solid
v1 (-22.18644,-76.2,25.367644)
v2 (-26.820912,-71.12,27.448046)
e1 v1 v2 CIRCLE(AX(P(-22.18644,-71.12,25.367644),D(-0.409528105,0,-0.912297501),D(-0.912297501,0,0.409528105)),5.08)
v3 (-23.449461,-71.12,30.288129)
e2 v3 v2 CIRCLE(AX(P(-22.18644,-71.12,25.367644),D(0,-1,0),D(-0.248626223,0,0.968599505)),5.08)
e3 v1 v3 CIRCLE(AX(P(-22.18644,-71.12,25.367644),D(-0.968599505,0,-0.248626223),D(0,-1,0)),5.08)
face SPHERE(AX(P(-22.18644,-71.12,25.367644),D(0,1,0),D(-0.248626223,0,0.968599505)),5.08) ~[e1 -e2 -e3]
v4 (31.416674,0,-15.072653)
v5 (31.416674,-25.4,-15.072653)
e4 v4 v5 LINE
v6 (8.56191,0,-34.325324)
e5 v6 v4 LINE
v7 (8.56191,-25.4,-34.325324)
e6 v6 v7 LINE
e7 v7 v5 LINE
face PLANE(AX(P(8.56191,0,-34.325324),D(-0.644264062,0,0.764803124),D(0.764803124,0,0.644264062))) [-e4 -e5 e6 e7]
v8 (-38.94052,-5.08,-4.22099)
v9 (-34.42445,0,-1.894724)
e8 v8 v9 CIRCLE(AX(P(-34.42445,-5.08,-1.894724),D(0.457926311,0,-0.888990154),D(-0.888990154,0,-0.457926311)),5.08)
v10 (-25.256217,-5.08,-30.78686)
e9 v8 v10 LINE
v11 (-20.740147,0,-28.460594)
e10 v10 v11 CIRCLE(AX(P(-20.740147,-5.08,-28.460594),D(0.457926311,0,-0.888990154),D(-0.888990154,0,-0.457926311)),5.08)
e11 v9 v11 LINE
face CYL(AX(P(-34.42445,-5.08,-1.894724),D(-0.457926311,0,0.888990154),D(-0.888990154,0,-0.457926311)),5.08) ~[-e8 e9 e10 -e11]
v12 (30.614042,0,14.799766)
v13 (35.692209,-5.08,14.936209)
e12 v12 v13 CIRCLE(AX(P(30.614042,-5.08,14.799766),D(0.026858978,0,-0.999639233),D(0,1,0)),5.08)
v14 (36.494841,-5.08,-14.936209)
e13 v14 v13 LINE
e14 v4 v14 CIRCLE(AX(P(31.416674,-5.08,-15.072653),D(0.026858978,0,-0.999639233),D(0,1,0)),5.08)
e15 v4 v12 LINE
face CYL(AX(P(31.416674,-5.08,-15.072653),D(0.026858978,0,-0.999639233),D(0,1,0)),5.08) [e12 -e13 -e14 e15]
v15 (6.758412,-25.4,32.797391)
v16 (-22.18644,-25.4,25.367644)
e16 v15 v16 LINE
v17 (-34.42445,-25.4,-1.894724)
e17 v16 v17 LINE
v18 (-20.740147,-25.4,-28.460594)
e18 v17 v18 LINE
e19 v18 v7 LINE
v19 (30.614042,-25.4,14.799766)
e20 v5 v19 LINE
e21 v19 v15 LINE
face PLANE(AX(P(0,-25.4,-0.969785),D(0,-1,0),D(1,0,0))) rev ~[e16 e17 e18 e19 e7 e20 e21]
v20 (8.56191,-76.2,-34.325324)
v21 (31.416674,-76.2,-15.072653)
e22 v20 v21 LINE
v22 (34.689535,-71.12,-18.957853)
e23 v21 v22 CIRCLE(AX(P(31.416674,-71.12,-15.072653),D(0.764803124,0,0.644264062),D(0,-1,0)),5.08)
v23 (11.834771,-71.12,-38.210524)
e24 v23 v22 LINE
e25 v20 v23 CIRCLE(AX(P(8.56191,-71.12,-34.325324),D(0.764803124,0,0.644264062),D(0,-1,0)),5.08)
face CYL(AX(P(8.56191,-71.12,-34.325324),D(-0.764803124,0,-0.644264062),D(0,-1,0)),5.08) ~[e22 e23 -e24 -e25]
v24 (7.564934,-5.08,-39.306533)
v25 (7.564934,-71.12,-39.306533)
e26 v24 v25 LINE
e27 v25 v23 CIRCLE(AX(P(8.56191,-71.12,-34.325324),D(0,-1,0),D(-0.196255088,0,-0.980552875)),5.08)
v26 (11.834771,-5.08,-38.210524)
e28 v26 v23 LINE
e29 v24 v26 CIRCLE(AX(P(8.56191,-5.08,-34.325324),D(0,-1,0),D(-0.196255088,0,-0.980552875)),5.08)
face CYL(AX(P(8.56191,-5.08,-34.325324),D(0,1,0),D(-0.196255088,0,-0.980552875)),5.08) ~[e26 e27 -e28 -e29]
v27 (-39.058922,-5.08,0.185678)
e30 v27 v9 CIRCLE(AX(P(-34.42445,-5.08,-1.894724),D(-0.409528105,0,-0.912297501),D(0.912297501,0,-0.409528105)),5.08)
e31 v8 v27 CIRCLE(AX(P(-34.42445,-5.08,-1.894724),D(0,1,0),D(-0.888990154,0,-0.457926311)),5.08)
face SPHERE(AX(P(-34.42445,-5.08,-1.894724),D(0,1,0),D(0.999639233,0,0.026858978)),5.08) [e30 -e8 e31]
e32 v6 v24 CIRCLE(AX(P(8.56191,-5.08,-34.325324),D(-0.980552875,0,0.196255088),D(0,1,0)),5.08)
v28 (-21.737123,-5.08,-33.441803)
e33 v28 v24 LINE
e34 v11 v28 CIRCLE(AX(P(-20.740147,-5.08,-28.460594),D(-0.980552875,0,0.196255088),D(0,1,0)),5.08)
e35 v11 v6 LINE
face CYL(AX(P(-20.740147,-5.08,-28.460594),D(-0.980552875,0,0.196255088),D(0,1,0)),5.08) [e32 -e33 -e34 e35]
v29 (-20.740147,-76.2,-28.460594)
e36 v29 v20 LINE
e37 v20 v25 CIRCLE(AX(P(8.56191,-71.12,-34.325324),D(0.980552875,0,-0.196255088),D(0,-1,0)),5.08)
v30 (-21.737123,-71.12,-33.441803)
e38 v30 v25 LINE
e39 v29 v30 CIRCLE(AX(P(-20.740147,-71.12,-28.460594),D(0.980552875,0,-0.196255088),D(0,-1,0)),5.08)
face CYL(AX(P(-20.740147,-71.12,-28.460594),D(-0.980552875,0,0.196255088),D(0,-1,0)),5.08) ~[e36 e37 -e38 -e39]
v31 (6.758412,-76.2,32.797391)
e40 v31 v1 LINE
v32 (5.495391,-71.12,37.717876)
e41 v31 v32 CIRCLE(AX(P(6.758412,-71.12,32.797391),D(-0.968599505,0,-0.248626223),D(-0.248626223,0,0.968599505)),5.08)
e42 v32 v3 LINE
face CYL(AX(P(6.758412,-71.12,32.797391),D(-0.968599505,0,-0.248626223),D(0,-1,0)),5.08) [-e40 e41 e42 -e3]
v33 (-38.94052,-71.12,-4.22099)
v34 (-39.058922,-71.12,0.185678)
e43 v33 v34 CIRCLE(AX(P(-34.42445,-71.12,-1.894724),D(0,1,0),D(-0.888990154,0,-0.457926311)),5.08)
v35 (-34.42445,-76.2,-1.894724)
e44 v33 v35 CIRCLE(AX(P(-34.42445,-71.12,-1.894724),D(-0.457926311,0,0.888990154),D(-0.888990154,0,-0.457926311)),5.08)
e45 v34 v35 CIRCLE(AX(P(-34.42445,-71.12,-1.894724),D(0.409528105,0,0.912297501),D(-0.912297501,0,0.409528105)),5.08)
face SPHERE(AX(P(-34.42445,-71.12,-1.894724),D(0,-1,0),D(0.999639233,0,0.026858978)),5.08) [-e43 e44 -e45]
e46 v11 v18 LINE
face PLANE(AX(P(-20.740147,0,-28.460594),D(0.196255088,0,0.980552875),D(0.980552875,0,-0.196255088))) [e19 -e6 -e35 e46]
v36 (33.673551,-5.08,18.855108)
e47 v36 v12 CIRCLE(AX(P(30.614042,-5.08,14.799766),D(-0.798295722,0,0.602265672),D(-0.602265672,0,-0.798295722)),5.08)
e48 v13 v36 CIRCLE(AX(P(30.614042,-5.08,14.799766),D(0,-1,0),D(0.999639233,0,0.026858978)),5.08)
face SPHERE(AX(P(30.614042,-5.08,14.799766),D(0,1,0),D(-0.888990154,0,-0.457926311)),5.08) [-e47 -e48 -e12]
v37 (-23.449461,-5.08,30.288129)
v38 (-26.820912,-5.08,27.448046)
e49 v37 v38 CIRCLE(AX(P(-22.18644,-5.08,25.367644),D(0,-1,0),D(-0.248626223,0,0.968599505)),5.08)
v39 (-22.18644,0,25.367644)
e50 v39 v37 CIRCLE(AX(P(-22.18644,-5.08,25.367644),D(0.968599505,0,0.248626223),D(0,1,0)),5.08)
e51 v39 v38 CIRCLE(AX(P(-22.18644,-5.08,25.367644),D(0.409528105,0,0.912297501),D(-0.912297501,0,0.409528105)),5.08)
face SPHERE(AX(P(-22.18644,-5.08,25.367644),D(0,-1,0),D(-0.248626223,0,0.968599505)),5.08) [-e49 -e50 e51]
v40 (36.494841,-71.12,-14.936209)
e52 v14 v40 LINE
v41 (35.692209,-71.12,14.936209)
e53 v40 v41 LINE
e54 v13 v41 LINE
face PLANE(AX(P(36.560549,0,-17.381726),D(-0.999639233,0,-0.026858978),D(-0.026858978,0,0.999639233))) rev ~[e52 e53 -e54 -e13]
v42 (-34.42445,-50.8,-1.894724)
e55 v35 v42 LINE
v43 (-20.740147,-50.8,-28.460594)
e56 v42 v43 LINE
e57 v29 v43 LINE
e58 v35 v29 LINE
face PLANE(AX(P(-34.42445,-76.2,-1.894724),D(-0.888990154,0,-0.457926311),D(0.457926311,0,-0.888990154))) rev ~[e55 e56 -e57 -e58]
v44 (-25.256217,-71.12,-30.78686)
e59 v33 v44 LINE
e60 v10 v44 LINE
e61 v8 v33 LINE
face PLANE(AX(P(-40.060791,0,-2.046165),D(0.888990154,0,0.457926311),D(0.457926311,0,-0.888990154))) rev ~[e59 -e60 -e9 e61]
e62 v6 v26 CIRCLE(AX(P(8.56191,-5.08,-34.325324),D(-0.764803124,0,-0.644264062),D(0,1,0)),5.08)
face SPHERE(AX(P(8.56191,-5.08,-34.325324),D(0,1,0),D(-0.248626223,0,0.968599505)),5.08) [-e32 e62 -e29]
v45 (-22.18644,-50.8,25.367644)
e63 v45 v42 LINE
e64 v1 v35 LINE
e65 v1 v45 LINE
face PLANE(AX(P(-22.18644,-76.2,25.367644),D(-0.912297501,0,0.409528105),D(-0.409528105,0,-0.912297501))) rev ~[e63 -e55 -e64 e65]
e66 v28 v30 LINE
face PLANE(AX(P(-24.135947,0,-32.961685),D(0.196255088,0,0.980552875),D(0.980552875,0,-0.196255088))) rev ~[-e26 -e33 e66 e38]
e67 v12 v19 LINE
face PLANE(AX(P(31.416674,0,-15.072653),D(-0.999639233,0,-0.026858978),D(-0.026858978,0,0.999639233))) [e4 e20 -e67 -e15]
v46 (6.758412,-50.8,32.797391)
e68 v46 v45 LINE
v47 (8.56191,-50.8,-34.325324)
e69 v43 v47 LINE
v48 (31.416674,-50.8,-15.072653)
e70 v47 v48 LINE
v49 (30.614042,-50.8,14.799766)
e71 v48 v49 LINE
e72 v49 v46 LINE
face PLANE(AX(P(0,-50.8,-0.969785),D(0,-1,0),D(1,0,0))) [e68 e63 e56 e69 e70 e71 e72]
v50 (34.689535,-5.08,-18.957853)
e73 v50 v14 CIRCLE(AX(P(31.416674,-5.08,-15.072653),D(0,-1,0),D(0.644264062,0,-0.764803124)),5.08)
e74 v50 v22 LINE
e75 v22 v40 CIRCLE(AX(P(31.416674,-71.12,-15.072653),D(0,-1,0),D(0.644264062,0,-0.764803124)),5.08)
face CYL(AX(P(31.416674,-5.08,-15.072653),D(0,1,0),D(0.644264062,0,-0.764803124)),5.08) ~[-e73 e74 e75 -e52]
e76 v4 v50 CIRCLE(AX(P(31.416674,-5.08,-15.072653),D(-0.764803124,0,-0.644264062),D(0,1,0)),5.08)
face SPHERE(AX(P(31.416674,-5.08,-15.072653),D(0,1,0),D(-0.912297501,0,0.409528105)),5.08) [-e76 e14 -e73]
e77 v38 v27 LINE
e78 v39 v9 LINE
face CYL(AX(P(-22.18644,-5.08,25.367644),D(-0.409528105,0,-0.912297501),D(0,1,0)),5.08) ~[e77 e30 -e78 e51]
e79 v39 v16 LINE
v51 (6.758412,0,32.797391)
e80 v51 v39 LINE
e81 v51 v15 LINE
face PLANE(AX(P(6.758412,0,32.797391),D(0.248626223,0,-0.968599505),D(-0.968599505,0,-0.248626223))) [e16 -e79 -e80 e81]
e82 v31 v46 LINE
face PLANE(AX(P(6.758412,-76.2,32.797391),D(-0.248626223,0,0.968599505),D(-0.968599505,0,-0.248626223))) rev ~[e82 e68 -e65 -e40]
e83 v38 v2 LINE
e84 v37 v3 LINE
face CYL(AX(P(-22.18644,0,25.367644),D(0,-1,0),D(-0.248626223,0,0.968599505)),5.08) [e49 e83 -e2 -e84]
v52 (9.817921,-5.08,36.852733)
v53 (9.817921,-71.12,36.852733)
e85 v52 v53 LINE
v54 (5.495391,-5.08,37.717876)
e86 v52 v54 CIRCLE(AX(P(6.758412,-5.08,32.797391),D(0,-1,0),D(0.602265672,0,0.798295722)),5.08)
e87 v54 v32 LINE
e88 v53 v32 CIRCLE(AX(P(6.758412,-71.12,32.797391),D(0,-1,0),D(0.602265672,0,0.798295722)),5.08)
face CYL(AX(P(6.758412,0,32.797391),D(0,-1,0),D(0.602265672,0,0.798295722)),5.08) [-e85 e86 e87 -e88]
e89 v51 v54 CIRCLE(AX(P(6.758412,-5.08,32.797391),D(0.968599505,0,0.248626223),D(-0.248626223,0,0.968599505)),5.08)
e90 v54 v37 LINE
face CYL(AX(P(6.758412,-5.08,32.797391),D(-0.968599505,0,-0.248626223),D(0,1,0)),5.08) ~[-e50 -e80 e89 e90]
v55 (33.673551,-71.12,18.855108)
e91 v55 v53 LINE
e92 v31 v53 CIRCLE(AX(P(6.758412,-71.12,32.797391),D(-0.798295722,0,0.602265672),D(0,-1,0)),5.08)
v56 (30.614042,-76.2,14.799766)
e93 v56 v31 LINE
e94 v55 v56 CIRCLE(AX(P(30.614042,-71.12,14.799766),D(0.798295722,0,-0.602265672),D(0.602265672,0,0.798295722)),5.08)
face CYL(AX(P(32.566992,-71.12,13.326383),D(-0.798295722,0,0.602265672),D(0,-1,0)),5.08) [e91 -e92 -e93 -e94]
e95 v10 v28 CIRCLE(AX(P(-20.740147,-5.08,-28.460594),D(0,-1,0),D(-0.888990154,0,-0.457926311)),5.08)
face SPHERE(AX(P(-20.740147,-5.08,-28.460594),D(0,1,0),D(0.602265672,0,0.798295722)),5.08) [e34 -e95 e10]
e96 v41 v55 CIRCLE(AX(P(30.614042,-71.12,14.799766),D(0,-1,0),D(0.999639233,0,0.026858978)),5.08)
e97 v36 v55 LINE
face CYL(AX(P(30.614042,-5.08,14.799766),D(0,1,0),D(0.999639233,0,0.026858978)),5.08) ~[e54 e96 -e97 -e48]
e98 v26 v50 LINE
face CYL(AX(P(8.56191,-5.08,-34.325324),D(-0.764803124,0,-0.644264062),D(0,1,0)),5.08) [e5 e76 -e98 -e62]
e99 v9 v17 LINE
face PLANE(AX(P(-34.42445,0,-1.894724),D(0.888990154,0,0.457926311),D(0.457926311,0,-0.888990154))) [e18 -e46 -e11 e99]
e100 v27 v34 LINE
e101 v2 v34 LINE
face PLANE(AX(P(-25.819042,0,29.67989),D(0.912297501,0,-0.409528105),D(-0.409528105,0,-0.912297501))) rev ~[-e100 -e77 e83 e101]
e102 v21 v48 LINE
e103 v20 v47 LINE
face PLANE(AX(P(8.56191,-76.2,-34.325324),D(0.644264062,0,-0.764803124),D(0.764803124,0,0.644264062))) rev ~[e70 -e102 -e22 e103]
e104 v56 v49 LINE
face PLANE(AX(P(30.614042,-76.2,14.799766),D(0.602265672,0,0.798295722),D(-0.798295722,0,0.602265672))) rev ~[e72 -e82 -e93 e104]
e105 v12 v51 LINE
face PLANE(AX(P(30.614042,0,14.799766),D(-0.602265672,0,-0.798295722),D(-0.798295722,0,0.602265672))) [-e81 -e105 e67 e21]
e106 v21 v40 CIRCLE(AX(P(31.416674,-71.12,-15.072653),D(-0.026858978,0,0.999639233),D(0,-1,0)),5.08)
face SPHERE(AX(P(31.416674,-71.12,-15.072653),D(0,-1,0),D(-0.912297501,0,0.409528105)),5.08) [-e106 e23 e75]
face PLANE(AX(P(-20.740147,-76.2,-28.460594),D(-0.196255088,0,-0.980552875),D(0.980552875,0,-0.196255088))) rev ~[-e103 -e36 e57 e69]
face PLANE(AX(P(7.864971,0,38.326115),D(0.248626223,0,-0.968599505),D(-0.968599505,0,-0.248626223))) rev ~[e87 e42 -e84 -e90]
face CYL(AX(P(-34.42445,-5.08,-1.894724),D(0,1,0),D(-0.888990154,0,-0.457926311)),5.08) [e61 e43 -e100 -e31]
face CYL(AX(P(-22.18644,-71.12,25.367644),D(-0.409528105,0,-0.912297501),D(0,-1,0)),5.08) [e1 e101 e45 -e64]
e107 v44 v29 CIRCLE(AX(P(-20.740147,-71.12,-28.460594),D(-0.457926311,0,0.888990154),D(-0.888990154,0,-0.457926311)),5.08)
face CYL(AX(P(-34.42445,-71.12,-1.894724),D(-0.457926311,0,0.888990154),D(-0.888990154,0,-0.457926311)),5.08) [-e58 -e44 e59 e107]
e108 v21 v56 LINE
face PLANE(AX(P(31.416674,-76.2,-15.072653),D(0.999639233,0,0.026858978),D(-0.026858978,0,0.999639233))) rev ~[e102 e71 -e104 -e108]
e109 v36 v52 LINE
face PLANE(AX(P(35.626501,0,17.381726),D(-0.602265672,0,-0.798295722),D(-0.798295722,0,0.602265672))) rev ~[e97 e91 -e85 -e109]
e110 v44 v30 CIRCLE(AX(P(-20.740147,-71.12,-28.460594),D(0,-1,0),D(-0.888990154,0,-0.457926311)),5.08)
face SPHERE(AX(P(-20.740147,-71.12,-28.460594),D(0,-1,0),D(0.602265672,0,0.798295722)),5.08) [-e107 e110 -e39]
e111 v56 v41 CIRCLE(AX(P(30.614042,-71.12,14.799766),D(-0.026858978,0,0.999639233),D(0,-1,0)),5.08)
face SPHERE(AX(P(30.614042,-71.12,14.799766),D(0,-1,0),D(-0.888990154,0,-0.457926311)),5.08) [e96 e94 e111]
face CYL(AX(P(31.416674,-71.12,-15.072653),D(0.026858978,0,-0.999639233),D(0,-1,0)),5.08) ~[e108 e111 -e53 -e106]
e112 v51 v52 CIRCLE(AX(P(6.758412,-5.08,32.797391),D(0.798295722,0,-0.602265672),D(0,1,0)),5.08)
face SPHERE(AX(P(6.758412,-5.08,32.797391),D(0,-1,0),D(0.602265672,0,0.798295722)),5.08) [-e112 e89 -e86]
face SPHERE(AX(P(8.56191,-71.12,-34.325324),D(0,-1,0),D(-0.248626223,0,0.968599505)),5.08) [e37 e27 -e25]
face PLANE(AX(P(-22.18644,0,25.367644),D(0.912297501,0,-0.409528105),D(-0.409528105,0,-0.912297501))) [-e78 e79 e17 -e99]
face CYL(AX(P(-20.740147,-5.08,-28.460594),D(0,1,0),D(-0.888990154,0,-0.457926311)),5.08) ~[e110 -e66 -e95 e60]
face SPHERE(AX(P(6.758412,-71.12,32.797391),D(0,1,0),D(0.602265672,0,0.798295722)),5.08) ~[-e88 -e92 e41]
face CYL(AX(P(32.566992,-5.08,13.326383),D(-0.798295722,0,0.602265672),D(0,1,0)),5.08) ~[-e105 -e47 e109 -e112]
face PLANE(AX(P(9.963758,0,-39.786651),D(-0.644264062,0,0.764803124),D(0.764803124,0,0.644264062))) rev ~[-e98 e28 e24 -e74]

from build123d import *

# Parameters (mm, degrees)
F1_DEPTH     = 76.2
F2_F1_R      = 5.08
F2_F2_R      = 5.08
F2_F3_R      = 5.08
F2_F4_R      = 5.08
F3_T1_DEPTH  = 66.04
F3_T3_DEPTH  = 29.883199232
F3_T5_DEPTH  = 29.883199232
F3_T7_DEPTH  = 29.883199232
F3_T9_DEPTH  = 29.883199232
F3_T14_DEPTH = 5.08
F3_T20_DEPTH = 5.08
F3_T26_DEPTH = 5.08
F3_T32_DEPTH = 5.08
F3_T38_DEPTH = 5.08
F3_T44_DEPTH = 5.08
F3_T50_DEPTH = 5.08
F3_T56_DEPTH = 5.08
F3_T62_DEPTH = 5.08
F3_T68_DEPTH = 5.08
F5_DEPTH     = 25.4
F6_DEPTH     = 25.4


# Not quite as in the source:
# - a fillet or chamfer that OpenCascade refuses, or shapes differently, is made with other operations: its cross-section is extruded or revolved along the edge and cut away or added
# - a feature of the source that left no trace in its solid (it failed there, or was rolled back) is left out


with BuildPart() as f1:
    # F0 (on Front) → F1 (new body)
    with BuildSketch(Plane.XZ):
        Polygon((36.5605491077, -17.381725656), (35.6265013603, 17.381725656), (7.8649714404, 38.3261150914), (-25.8190423903, 29.6798902177), (-40.0607906887, -2.0461652844), (-24.1359465072, -32.9616845282), (9.9637576777, -39.7866509615), align=None)
    extrude(amount=F1_DEPTH)

    # F2: fillet of radius 5.08 on 4 edges, made by hand

    # F2_f1
    f2_f1_edges = [f1.edges().sort_by_distance(p)[0] for p in [
        (7.8649714404, -38.1, 38.3261150914),
    ]]
    fillet(f2_f1_edges, radius=F2_F1_R)

    # F2_f2
    f2_f2_edges = [f1.edges().sort_by_distance(p)[0] for p in [
        (-25.8190423903, -38.1, 29.6798902177),
    ]]
    fillet(f2_f2_edges, radius=F2_F2_R)

    # F2_f3
    f2_f3_edges = [f1.edges().sort_by_distance(p)[0] for p in [
        (-8.9770354749, 0, 34.0030026545),
    ]]
    fillet(f2_f3_edges, radius=F2_F3_R)

    # F2_f4
    f2_f4_edges = [f1.edges().sort_by_distance(p)[0] for p in [
        (-8.9770354749, -76.2, 34.0030026545),
    ]]
    fillet(f2_f4_edges, radius=F2_F4_R)

    # F3: fillet of radius 5.08 on 19 edges, made by hand

    # F3_s2 → F3_t1 (cut)
    with BuildSketch(Plane.XZ.offset(5.08)):
        with BuildLine():
            ThreePointArc((35.6922091389, 14.9362091735), (35.1301118192, 17.1260312252), (33.6735514536, 18.8551078331))
            Line((33.6735514536, 18.8551078331), (35.6265013603, 17.381725656))
            Line((35.6265013603, 17.381725656), (35.6922091389, 14.9362091735))
        make_face()
        with BuildLine():
            ThreePointArc((34.6895354607, -18.957852653), (36.0511453352, -17.1530555552), (36.4948413291, -14.9362091735))
            Line((36.4948413291, -14.9362091735), (36.5605491077, -17.381725656))
            Line((36.5605491077, -17.381725656), (34.6895354607, -18.957852653))
        make_face()
        with BuildLine():
            ThreePointArc((7.564934043, -39.3065326972), (9.8249311044, -39.245809579), (11.8347713247, -38.2105239645))
            Line((11.8347713247, -38.2105239645), (9.9637576777, -39.7866509615))
            Line((9.9637576777, -39.7866509615), (7.564934043, -39.3065326972))
        make_face()
        with BuildLine():
            ThreePointArc((-25.2562170056, -30.7868598483), (-23.79965664, -32.5159364562), (-21.7371228725, -33.4418027925))
            Line((-21.7371228725, -33.4418027925), (-24.1359465072, -32.9616845282))
            Line((-24.1359465072, -32.9616845282), (-25.2562170056, -30.7868598483))
        make_face()
        with BuildLine():
            ThreePointArc((-38.9405201903, -4.2209899644), (-39.50261751, -2.0311679128), (-39.0589215161, 0.1856784689))
            Line((-39.0589215161, 0.1856784689), (-40.0607906887, -2.0461652844))
            Line((-40.0607906887, -2.0461652844), (-38.9405201903, -4.2209899644))
        make_face()
    extrude(amount=F3_T1_DEPTH, mode=Mode.SUBTRACT)

    # F3_s4 → F3_t3 (cut)
    with BuildSketch(Plane(origin=(0.4273541338, 0, -15.9052946325), x_dir=(0, 1, 0), z_dir=(-0.026858978, 0, 0.9996392326))):
        with BuildLine():
            ThreePointArc((-76.2, -31.0005038658), (-74.7121024484, -34.5926063143), (-71.12, -36.0805038658))
            Line((-71.12, -36.0805038658), (-76.2, -36.0805038658))
            Line((-76.2, -36.0805038658), (-76.2, -31.0005038658))
        make_face()
        with BuildLine():
            ThreePointArc((0, -31.0005038658), (-1.4878975516, -34.5926063143), (-5.08, -36.0805038658))
            Line((-5.08, -36.0805038658), (0, -36.0805038658))
            Line((0, -36.0805038658), (0, -31.0005038658))
        make_face()
    extrude(amount=F3_T3_DEPTH, mode=Mode.SUBTRACT)

    # F3_s6 → F3_t5 (cut)
    with BuildSketch(Plane(origin=(-11.9052292748, 0, -10.0288703376), x_dir=(0, 1, 0), z_dir=(0.7648031243, 0, 0.6442640616))):
        with BuildLine():
            ThreePointArc((0, -31.7682459503), (-1.4878975516, -35.3603483987), (-5.08, -36.8482459503))
            Line((-5.08, -36.8482459503), (0, -36.8482459503))
            Line((0, -36.8482459503), (0, -31.7682459503))
        make_face()
        with BuildLine():
            ThreePointArc((-76.2, -31.7682459503), (-74.7121024484, -35.3603483987), (-71.12, -36.8482459503))
            Line((-71.12, -36.8482459503), (-76.2, -36.8482459503))
            Line((-76.2, -36.8482459503), (-76.2, -31.7682459503))
        make_face()
    extrude(amount=F3_T5_DEPTH, mode=Mode.SUBTRACT)

    # F3_s8 → F3_t7 (cut)
    with BuildSketch(Plane(origin=(-14.4644044829, 0, 2.8950126528), x_dir=(0, 1, 0), z_dir=(0.9805528748, 0, -0.1962550883))):
        with BuildLine():
            ThreePointArc((0, -31.9774768364), (-1.4878975516, -35.5695792849), (-5.08, -37.0574768364))
            Line((-5.08, -37.0574768364), (0, -37.0574768364))
            Line((0, -37.0574768364), (0, -31.9774768364))
        make_face()
        with BuildLine():
            ThreePointArc((-76.2, -31.9774768364), (-74.7121024484, -35.5695792849), (-71.12, -37.0574768364))
            Line((-71.12, -37.0574768364), (-76.2, -37.0574768364))
            Line((-76.2, -37.0574768364), (-76.2, -31.9774768364))
        make_face()
    extrude(amount=F3_T7_DEPTH, mode=Mode.SUBTRACT)

    # F3_s10 → F3_t9 (cut)
    with BuildSketch(Plane(origin=(-6.4473598679, 0, 12.5165104158), x_dir=(0, 1, 0), z_dir=(0.457926311, 0, -0.8889901539))):
        with BuildLine():
            ThreePointArc((-71.12, -36.5506413995), (-74.7121024484, -35.0627438479), (-76.2, -31.4706413995))
            Line((-76.2, -31.4706413995), (-76.2, -36.5506413995))
            Line((-76.2, -36.5506413995), (-71.12, -36.5506413995))
        make_face()
        with BuildLine():
            ThreePointArc((-5.08, -36.5506413995), (-1.4878975516, -35.0627438479), (0, -31.4706413995))
            Line((0, -31.4706413995), (0, -36.5506413995))
            Line((0, -36.5506413995), (-5.08, -36.5506413995))
        make_face()
    extrude(amount=F3_T9_DEPTH, mode=Mode.SUBTRACT)


with BuildPart() as f3_tool12:
    # F3_s13 → F3_t14 (new body)
    with BuildSketch(Plane.XZ.offset(71.12)):
        Polygon((30.6140418374, 14.7997655654), (35.6922091389, 14.9362091735), (35.6265013603, 17.381725656), (33.6735514536, 18.8551078331), align=None)
    extrude(amount=F3_T14_DEPTH)

    # F3_s15 → F3_t16 (revolve, cut)
    with BuildSketch(Plane(origin=(30.6140418374, -71.12, 14.7997655654), x_dir=(-0.8889901539, 0, -0.457926311), z_dir=(-0.457926311, 0, 0.8889901539))):
        with BuildLine():
            ThreePointArc((0, -5.08), (5.08, 0), (0, 5.08))
            Line((0, 5.08), (0, -5.08))
        make_face()
    revolve(axis=Axis((30.6140418374, -71.12, 14.7997655654), (0, -1, 0)), mode=Mode.SUBTRACT)


with BuildPart() as f1_1:
    add(f1.part)

    # F3_t11: cut F3_tool12
    add(f3_tool12.part, mode=Mode.SUBTRACT)


with BuildPart() as f3_tool18:
    # F3_s19 → F3_t20 (new body)
    with BuildSketch(Plane.XZ.offset(5.08)):
        Polygon((30.6140418374, 14.7997655654), (35.6922091389, 14.9362091735), (35.6265013603, 17.381725656), (33.6735514536, 18.8551078331), align=None)
    extrude(amount=-F3_T20_DEPTH)

    # F3_s21 → F3_t22 (revolve, cut)
    with BuildSketch(Plane(origin=(30.6140418374, -5.08, 14.7997655654), x_dir=(-0.8889901539, 0, -0.457926311), z_dir=(0.457926311, 0, -0.8889901539))):
        with BuildLine():
            ThreePointArc((0, -5.08), (5.08, 0), (0, 5.08))
            Line((0, 5.08), (0, -5.08))
        make_face()
    revolve(axis=Axis((30.6140418374, -5.08, 14.7997655654), (0, 1, 0)), mode=Mode.SUBTRACT)


with BuildPart() as f1_2:
    add(f1_1.part)

    # F3_t17: cut F3_tool18
    add(f3_tool18.part, mode=Mode.SUBTRACT)


with BuildPart() as f3_tool24:
    # F3_s25 → F3_t26 (new body)
    with BuildSketch(Plane.XZ.offset(5.08)):
        Polygon((-34.4244502085, -1.8947243046), (-38.9405201903, -4.2209899644), (-40.0607906887, -2.0461652844), (-39.0589215161, 0.1856784689), align=None)
    extrude(amount=-F3_T26_DEPTH)

    # F3_s27 → F3_t28 (revolve, cut)
    with BuildSketch(Plane(origin=(-34.4244502085, -5.08, -1.8947243046), x_dir=(0.9996392326, 0, 0.026858978), z_dir=(-0.026858978, 0, 0.9996392326))):
        with BuildLine():
            ThreePointArc((0, -5.08), (5.08, 0), (0, 5.08))
            Line((0, 5.08), (0, -5.08))
        make_face()
    revolve(axis=Axis((-34.4244502085, -5.08, -1.8947243046), (0, 1, 0)), mode=Mode.SUBTRACT)


with BuildPart() as f1_3:
    add(f1_2.part)

    # F3_t23: cut F3_tool24
    add(f3_tool24.part, mode=Mode.SUBTRACT)


with BuildPart() as f3_tool30:
    # F3_s31 → F3_t32 (new body)
    with BuildSketch(Plane.XZ.offset(71.12)):
        Polygon((-34.4244502085, -1.8947243046), (-38.9405201903, -4.2209899644), (-40.0607906887, -2.0461652844), (-39.0589215161, 0.1856784689), align=None)
    extrude(amount=F3_T32_DEPTH)

    # F3_s33 → F3_t34 (revolve, cut)
    with BuildSketch(Plane(origin=(-34.4244502085, -71.12, -1.8947243046), x_dir=(0.9996392326, 0, 0.026858978), z_dir=(0.026858978, 0, -0.9996392326))):
        with BuildLine():
            ThreePointArc((0, -5.08), (5.08, 0), (0, 5.08))
            Line((0, 5.08), (0, -5.08))
        make_face()
    revolve(axis=Axis((-34.4244502085, -71.12, -1.8947243046), (0, -1, 0)), mode=Mode.SUBTRACT)


with BuildPart() as f1_4:
    add(f1_3.part)

    # F3_t29: cut F3_tool30
    add(f3_tool30.part, mode=Mode.SUBTRACT)


with BuildPart() as f3_tool36:
    # F3_s37 → F3_t38 (new body)
    with BuildSketch(Plane.XZ.offset(71.12)):
        Polygon((31.4166740277, -15.0726527817), (36.4948413291, -14.9362091735), (36.5605491077, -17.381725656), (34.6895354607, -18.957852653), align=None)
    extrude(amount=F3_T38_DEPTH)

    # F3_s39 → F3_t40 (revolve, cut)
    with BuildSketch(Plane(origin=(31.4166740277, -71.12, -15.0726527817), x_dir=(-0.9122975015, 0, 0.409528105), z_dir=(0.409528105, 0, 0.9122975015))):
        with BuildLine():
            ThreePointArc((0, -5.08), (5.08, 0), (0, 5.08))
            Line((0, 5.08), (0, -5.08))
        make_face()
    revolve(axis=Axis((31.4166740277, -71.12, -15.0726527817), (0, -1, 0)), mode=Mode.SUBTRACT)


with BuildPart() as f1_5:
    add(f1_4.part)

    # F3_t35: cut F3_tool36
    add(f3_tool36.part, mode=Mode.SUBTRACT)


with BuildPart() as f3_tool42:
    # F3_s43 → F3_t44 (new body)
    with BuildSketch(Plane.XZ.offset(5.08)):
        Polygon((31.4166740277, -15.0726527817), (36.4948413291, -14.9362091735), (36.5605491077, -17.381725656), (34.6895354607, -18.957852653), align=None)
    extrude(amount=-F3_T44_DEPTH)

    # F3_s45 → F3_t46 (revolve, cut)
    with BuildSketch(Plane(origin=(31.4166740277, -5.08, -15.0726527817), x_dir=(-0.9122975015, 0, 0.409528105), z_dir=(-0.409528105, 0, -0.9122975015))):
        with BuildLine():
            ThreePointArc((0, -5.08), (5.08, 0), (0, 5.08))
            Line((0, 5.08), (0, -5.08))
        make_face()
    revolve(axis=Axis((31.4166740277, -5.08, -15.0726527817), (0, 1, 0)), mode=Mode.SUBTRACT)


with BuildPart() as f1_6:
    add(f1_5.part)

    # F3_t41: cut F3_tool42
    add(f3_tool42.part, mode=Mode.SUBTRACT)


with BuildPart() as f3_tool48:
    # F3_s49 → F3_t50 (new body)
    with BuildSketch(Plane.XZ.offset(5.08)):
        Polygon((8.5619098917, -34.3253240931), (7.564934043, -39.3065326972), (9.9637576777, -39.7866509615), (11.8347713247, -38.2105239645), align=None)
    extrude(amount=-F3_T50_DEPTH)

    # F3_s51 → F3_t52 (revolve, cut)
    with BuildSketch(Plane(origin=(8.5619098917, -5.08, -34.3253240931), x_dir=(-0.248626223, 0, 0.9685995051), z_dir=(-0.9685995051, 0, -0.248626223))):
        with BuildLine():
            ThreePointArc((0, -5.08), (5.08, 0), (0, 5.08))
            Line((0, 5.08), (0, -5.08))
        make_face()
    revolve(axis=Axis((8.5619098917, -5.08, -34.3253240931), (0, 1, 0)), mode=Mode.SUBTRACT)


with BuildPart() as f1_7:
    add(f1_6.part)

    # F3_t47: cut F3_tool48
    add(f3_tool48.part, mode=Mode.SUBTRACT)


with BuildPart() as f3_tool54:
    # F3_s55 → F3_t56 (new body)
    with BuildSketch(Plane.XZ.offset(71.12)):
        Polygon((8.5619098917, -34.3253240931), (7.564934043, -39.3065326972), (9.9637576777, -39.7866509615), (11.8347713247, -38.2105239645), align=None)
    extrude(amount=F3_T56_DEPTH)

    # F3_s57 → F3_t58 (revolve, cut)
    with BuildSketch(Plane(origin=(8.5619098917, -71.12, -34.3253240931), x_dir=(-0.248626223, 0, 0.9685995051), z_dir=(0.9685995051, 0, 0.248626223))):
        with BuildLine():
            ThreePointArc((0, -5.08), (5.08, 0), (0, 5.08))
            Line((0, 5.08), (0, -5.08))
        make_face()
    revolve(axis=Axis((8.5619098917, -71.12, -34.3253240931), (0, -1, 0)), mode=Mode.SUBTRACT)


with BuildPart() as f1_8:
    add(f1_7.part)

    # F3_t53: cut F3_tool54
    add(f3_tool54.part, mode=Mode.SUBTRACT)


with BuildPart() as f3_tool60:
    # F3_s61 → F3_t62 (new body)
    with BuildSketch(Plane.XZ.offset(5.08)):
        Polygon((-20.7401470239, -28.4605941885), (-21.7371228725, -33.4418027925), (-24.1359465072, -32.9616845282), (-25.2562170056, -30.7868598483), align=None)
    extrude(amount=-F3_T62_DEPTH)

    # F3_s63 → F3_t64 (revolve, cut)
    with BuildSketch(Plane(origin=(-20.7401470239, -5.08, -28.4605941885), x_dir=(0.6022656725, 0, 0.798295722), z_dir=(-0.798295722, 0, 0.6022656725))):
        with BuildLine():
            ThreePointArc((0, -5.08), (5.08, 0), (0, 5.08))
            Line((0, 5.08), (0, -5.08))
        make_face()
    revolve(axis=Axis((-20.7401470239, -5.08, -28.4605941885), (0, 1, 0)), mode=Mode.SUBTRACT)


with BuildPart() as f1_9:
    add(f1_8.part)

    # F3_t59: cut F3_tool60
    add(f3_tool60.part, mode=Mode.SUBTRACT)


with BuildPart() as f3_tool66:
    # F3_s67 → F3_t68 (new body)
    with BuildSketch(Plane.XZ.offset(71.12)):
        Polygon((-20.7401470239, -28.4605941885), (-21.7371228725, -33.4418027925), (-24.1359465072, -32.9616845282), (-25.2562170056, -30.7868598483), align=None)
    extrude(amount=F3_T68_DEPTH)

    # F3_s69 → F3_t70 (revolve, cut)
    with BuildSketch(Plane(origin=(-20.7401470239, -71.12, -28.4605941885), x_dir=(0.6022656725, 0, 0.798295722), z_dir=(0.798295722, 0, -0.6022656725))):
        with BuildLine():
            ThreePointArc((0, -5.08), (5.08, 0), (0, 5.08))
            Line((0, 5.08), (0, -5.08))
        make_face()
    revolve(axis=Axis((-20.7401470239, -71.12, -28.4605941885), (0, -1, 0)), mode=Mode.SUBTRACT)


with BuildPart() as f1_10:
    add(f1_9.part)

    # F3_t65: cut F3_tool66
    add(f3_tool66.part, mode=Mode.SUBTRACT)

    # F5 (cut): a face of the model
    f5_faces = [f1_10.faces().sort_by_distance(p)[0] for p in [
        (0, -76.2, -0.9697850665),
    ]]
    extrude(f5_faces, amount=-F5_DEPTH, mode=Mode.SUBTRACT)

    # F6 (cut): a face of the model
    f6_faces = [f1_10.faces().sort_by_distance(p)[0] for p in [
        (0, 0, -0.9697850665),
    ]]
    extrude(f6_faces, amount=-F6_DEPTH, mode=Mode.SUBTRACT)


solid = f1_10.part
